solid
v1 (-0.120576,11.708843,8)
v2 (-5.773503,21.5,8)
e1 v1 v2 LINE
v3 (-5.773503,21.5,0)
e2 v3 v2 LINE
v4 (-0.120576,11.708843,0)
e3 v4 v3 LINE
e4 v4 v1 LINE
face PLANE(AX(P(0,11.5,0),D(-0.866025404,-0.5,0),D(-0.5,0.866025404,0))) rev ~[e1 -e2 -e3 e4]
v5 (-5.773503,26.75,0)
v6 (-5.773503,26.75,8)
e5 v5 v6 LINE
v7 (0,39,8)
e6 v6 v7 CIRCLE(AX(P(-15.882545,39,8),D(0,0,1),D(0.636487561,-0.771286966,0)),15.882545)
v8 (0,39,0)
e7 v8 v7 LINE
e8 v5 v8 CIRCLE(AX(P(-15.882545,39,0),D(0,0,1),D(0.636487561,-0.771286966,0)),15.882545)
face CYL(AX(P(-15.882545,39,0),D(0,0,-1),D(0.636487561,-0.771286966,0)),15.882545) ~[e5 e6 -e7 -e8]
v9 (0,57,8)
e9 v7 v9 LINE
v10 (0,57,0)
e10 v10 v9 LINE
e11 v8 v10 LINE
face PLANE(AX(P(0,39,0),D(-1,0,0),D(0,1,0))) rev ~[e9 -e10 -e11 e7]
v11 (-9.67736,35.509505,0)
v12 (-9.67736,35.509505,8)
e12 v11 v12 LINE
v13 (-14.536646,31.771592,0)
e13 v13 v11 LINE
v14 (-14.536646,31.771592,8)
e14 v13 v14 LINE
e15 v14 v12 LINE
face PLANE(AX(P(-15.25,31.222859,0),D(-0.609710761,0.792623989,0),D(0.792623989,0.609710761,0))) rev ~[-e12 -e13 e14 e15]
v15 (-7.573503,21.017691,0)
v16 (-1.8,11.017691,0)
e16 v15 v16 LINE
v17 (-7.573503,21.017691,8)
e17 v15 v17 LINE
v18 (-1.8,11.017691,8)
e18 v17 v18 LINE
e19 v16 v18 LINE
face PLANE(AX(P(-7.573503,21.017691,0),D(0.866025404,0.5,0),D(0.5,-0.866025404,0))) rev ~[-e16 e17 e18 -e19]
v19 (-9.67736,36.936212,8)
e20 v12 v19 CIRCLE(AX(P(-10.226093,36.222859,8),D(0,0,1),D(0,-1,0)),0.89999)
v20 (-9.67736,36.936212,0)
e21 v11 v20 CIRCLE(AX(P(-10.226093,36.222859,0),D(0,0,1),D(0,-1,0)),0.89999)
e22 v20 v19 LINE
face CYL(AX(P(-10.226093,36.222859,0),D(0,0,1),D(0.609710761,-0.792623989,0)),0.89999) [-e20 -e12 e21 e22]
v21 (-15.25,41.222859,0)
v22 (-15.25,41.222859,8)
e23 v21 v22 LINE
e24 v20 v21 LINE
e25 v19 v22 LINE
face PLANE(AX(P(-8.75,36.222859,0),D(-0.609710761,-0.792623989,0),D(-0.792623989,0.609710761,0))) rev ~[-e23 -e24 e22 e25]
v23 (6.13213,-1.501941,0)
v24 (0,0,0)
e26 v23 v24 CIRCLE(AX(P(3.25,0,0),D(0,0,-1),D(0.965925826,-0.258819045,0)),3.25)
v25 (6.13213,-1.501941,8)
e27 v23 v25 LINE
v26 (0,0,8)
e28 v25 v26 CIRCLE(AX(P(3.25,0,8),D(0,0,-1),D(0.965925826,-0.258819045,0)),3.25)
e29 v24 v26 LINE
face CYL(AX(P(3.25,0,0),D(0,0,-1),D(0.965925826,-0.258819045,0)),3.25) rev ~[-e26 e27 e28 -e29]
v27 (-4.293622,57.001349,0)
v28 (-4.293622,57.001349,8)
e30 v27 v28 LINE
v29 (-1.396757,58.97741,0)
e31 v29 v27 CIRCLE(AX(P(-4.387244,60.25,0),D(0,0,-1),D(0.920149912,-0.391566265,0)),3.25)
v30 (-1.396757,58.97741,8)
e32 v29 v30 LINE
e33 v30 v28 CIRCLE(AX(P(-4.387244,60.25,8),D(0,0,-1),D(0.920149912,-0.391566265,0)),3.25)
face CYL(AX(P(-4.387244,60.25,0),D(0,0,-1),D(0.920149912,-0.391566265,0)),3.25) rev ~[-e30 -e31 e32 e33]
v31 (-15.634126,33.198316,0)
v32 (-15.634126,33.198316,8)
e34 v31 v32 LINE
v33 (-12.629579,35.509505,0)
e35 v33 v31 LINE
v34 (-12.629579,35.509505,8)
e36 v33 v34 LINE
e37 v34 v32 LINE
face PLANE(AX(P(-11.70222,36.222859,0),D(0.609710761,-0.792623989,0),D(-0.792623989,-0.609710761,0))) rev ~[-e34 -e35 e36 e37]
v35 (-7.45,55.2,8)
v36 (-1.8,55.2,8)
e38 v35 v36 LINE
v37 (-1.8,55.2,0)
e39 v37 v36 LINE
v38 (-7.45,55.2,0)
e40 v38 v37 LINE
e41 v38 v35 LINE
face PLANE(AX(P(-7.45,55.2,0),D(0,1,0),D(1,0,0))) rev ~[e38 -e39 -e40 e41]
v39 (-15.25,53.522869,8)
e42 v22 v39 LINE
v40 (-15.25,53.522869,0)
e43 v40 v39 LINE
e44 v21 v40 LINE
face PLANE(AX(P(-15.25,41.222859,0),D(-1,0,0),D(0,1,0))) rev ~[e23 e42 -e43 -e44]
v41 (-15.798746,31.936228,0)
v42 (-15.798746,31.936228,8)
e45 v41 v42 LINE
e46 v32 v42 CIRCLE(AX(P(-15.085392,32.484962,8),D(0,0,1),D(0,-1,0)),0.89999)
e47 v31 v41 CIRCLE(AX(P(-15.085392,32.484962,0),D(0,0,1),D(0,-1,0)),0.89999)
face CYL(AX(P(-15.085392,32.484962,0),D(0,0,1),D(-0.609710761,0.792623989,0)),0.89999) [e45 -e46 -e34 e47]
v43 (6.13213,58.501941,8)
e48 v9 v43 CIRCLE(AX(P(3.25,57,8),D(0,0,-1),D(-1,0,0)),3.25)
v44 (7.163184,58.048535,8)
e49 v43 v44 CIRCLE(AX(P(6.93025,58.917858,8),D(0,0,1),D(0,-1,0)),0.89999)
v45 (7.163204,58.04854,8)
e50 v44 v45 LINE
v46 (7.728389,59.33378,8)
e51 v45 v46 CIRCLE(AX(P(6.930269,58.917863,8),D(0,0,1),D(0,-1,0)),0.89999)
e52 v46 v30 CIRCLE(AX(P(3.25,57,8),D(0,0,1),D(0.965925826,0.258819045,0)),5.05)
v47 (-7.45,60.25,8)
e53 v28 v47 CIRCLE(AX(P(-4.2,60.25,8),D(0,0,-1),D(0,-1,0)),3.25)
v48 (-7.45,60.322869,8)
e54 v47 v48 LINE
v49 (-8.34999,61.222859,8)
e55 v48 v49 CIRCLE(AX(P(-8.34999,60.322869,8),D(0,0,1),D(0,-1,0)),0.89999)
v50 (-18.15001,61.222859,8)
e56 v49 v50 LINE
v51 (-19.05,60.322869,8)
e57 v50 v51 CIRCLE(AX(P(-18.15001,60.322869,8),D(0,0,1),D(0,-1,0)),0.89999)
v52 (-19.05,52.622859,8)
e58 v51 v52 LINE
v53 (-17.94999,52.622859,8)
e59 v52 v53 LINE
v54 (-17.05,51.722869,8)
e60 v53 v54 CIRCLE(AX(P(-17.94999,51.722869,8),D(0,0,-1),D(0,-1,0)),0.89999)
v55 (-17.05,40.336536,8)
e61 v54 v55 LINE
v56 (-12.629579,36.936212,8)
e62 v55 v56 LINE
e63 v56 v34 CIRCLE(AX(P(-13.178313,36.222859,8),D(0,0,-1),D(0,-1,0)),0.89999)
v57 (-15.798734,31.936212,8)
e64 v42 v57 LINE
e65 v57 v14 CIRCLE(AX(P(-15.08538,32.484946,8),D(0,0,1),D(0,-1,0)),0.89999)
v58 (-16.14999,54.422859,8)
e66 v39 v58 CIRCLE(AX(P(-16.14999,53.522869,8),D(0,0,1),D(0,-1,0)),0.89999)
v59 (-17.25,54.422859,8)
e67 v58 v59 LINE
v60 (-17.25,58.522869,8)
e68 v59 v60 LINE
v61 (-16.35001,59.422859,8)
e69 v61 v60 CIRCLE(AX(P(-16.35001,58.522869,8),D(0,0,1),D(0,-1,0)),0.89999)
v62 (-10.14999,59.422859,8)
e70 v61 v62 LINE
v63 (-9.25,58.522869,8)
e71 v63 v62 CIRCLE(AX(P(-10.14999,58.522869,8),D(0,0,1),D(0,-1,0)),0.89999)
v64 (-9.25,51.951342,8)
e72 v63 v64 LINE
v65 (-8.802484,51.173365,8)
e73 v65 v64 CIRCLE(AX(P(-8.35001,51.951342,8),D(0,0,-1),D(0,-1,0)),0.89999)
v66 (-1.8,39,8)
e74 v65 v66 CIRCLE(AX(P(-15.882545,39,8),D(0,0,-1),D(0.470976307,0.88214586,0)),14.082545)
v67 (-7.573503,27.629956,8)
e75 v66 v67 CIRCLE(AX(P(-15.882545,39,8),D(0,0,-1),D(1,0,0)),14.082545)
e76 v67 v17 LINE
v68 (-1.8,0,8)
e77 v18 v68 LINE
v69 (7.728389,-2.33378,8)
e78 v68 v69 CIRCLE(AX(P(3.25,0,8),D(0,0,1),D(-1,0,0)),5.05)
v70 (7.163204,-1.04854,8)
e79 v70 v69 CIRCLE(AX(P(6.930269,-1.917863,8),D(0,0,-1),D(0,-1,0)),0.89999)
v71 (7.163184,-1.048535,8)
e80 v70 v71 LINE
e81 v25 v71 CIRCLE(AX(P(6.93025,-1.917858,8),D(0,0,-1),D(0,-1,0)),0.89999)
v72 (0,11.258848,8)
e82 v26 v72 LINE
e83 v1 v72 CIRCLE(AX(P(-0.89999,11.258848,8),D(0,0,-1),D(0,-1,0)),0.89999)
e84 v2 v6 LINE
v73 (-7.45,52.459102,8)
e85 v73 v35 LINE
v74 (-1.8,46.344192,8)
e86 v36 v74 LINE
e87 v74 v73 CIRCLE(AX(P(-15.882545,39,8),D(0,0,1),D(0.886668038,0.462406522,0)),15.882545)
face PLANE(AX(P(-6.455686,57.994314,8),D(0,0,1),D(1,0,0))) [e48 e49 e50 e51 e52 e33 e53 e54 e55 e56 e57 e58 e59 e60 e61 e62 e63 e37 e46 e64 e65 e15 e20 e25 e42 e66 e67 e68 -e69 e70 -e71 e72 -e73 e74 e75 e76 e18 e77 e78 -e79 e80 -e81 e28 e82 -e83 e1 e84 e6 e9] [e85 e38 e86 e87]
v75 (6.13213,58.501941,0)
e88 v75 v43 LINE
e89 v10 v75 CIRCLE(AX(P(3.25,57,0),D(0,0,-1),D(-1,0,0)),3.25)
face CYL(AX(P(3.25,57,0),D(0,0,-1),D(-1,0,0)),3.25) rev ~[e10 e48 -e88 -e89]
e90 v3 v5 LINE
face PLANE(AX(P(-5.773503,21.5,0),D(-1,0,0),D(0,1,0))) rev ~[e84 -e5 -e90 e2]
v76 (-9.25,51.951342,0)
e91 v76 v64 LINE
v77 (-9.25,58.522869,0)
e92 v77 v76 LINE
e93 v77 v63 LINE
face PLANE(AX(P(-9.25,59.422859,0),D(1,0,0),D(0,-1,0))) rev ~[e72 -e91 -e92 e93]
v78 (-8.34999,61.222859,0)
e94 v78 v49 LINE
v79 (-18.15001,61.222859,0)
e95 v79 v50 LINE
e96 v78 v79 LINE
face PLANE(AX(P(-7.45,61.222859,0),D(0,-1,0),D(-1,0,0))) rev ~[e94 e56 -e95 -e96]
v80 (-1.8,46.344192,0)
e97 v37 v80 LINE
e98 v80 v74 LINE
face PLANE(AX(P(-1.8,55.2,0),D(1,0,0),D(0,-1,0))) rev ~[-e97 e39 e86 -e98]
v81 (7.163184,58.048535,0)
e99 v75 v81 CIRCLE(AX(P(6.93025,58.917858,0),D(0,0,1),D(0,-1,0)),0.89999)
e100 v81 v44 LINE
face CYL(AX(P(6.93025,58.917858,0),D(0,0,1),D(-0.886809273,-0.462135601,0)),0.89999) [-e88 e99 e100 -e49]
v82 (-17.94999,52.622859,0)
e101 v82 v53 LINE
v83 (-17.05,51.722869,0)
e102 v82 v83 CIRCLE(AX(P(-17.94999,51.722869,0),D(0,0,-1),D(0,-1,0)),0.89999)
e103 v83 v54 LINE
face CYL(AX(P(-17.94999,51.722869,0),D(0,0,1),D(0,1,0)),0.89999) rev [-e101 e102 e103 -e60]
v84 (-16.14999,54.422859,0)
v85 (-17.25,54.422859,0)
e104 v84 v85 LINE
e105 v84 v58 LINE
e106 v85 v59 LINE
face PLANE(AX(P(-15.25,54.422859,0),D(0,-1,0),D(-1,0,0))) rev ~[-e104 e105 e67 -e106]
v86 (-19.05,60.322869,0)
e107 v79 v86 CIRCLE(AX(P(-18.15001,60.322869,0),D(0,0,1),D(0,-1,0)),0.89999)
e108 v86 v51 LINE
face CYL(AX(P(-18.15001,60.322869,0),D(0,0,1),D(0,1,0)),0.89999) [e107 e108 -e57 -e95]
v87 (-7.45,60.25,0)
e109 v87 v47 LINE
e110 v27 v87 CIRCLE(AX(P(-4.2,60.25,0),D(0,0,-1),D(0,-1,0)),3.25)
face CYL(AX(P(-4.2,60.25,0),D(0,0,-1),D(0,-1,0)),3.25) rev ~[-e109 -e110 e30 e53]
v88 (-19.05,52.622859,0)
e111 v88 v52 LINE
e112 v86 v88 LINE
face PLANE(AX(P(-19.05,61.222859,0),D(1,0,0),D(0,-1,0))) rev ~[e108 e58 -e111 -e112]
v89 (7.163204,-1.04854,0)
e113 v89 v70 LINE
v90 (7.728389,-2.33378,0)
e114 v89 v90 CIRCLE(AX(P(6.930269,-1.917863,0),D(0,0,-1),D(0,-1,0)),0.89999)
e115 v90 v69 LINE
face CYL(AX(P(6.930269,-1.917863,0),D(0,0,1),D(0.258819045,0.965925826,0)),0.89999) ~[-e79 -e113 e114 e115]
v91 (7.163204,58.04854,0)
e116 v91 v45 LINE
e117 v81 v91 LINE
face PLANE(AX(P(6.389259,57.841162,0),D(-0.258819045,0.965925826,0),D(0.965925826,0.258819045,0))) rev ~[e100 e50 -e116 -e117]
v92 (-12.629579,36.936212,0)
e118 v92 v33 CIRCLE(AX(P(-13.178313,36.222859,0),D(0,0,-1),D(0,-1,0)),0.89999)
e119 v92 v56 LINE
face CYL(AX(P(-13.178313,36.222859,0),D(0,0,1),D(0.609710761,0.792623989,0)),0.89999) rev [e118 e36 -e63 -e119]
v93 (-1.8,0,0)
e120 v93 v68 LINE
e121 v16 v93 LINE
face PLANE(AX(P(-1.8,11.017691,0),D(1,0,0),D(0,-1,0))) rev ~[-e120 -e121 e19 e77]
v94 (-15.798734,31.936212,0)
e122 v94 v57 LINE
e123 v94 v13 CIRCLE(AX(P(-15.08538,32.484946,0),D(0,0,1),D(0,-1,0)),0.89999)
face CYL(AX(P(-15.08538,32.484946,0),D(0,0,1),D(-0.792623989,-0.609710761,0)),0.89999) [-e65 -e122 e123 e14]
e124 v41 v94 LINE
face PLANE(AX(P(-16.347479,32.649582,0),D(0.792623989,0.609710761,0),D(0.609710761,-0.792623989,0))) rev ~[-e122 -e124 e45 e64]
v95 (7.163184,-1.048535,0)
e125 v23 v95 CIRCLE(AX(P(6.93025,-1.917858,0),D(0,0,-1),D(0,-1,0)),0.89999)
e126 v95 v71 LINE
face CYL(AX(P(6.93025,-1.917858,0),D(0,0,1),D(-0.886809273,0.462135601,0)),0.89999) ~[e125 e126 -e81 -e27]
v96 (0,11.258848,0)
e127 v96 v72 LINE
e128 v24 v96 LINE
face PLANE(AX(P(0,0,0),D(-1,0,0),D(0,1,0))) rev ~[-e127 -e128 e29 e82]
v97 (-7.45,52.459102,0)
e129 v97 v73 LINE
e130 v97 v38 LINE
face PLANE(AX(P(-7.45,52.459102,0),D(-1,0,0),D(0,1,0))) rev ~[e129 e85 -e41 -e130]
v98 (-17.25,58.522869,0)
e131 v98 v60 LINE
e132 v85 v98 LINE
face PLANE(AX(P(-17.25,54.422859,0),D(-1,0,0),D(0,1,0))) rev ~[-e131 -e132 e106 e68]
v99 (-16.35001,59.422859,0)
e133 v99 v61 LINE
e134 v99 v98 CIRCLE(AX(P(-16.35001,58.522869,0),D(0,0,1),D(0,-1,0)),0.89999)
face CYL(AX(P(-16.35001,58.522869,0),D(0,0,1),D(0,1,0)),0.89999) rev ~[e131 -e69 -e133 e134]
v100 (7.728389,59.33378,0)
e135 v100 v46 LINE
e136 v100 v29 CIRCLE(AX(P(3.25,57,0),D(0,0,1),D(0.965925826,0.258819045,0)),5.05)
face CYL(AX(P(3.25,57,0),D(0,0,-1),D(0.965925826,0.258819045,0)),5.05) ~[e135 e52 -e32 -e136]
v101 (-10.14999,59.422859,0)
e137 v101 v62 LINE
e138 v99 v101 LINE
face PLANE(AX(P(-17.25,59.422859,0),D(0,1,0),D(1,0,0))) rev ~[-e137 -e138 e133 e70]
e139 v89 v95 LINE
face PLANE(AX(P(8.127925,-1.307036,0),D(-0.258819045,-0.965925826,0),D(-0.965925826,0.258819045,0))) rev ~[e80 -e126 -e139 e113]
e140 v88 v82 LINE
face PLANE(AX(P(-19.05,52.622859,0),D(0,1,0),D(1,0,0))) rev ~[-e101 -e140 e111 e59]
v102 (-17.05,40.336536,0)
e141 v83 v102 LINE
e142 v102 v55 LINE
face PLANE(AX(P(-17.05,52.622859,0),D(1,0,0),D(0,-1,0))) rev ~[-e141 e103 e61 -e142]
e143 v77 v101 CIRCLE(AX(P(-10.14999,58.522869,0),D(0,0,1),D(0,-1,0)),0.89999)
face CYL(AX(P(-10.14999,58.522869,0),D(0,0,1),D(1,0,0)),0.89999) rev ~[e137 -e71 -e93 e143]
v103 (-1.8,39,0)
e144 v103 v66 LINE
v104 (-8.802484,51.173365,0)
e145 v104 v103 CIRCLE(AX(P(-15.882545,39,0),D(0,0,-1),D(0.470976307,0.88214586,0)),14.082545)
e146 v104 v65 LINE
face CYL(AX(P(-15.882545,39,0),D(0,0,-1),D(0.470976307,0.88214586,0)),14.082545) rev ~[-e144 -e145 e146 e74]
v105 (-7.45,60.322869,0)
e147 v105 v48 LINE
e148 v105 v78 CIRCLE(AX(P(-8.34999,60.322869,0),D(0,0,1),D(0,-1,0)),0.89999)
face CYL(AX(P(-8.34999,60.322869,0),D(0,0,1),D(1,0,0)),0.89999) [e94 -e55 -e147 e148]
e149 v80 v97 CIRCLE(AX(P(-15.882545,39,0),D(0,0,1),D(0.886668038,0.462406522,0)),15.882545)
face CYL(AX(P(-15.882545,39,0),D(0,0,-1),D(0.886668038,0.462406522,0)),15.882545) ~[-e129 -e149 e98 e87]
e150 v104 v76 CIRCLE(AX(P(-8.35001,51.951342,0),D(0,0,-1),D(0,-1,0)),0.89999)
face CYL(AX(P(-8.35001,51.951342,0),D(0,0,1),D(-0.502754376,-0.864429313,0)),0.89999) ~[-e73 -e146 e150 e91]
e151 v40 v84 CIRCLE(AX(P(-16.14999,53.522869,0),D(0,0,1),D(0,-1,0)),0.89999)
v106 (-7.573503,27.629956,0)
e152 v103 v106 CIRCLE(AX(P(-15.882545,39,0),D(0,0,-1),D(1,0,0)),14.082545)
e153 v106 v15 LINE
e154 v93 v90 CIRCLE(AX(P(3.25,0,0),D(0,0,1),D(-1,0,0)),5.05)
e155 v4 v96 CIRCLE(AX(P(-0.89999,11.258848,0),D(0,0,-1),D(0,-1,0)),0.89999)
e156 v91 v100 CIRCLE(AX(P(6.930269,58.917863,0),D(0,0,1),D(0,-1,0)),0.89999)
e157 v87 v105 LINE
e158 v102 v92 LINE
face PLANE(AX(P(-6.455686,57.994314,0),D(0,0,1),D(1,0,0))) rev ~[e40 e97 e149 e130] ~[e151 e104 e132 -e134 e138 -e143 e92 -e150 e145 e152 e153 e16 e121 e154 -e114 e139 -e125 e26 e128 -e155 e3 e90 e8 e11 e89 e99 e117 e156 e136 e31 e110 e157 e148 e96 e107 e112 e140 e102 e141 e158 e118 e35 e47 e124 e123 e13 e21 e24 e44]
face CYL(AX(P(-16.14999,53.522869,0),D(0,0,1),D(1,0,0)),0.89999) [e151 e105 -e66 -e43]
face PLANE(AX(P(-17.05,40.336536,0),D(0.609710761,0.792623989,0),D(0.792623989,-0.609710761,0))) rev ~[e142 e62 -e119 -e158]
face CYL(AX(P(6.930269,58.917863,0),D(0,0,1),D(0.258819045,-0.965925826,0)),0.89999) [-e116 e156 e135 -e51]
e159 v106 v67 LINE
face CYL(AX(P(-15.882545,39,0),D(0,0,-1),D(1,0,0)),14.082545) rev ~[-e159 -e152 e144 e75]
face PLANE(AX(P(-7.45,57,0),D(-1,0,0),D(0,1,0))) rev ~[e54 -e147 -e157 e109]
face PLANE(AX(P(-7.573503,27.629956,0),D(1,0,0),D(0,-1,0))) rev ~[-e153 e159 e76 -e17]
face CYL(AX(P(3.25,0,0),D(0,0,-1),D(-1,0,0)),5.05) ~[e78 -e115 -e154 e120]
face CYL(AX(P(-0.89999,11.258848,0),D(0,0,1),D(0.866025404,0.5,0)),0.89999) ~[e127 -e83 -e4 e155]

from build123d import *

# Parameters (mm, degrees)
F1_DEPTH    = 8
F2_R        = 0.89999
F3_T1_DEPTH = 8


# Not quite as in the source:
# - a fillet or chamfer that OpenCascade refuses, or shapes differently, is made with other operations: its cross-section is extruded or revolved along the edge and cut away or added
# - a fillet or chamfer is up to 0.001 mm smaller than in the source, because OpenCascade refuses the exact size
# - a feature names something its author has since deleted; it is built from what else it names


with BuildPart() as f1:
    # F0 (on Top) → F1 (new body)
    with BuildSketch(Plane.XY):
        with BuildLine():
            ThreePointArc((0, 57), (2.8257898753, 60.2221957995), (6.3892589354, 57.8411618966))
            Line((6.3892589354, 57.8411618966), (8.1279254228, 58.3070361778))
            ThreePointArc((8.1279254228, 58.3070361778), (2.5908427293, 62.0067965499), (-1.8, 57))
            Line((-1.8, 57), (-7.45, 57))
            Line((-7.45, 57), (-7.45, 61.2228588262))
            Line((-7.45, 61.2228588262), (-9.7, 61.2228588262))
            Line((-9.7, 61.2228588262), (-19.05, 61.2228588262))
            Line((-19.05, 61.2228588262), (-19.05, 52.6228588262))
            Line((-19.05, 52.6228588262), (-17.05, 52.6228588262))
            Line((-17.05, 52.6228588262), (-17.05, 40.3365361308))
            Line((-17.05, 40.3365361308), (-11.702219504, 36.2228588262))
            Line((-11.702219504, 36.2228588262), (-16.3474793695, 32.6495820066))
            Line((-16.3474793695, 32.6495820066), (-15.25, 31.2228588262))
            Line((-15.25, 31.2228588262), (-8.75, 36.2228588262))
            Line((-8.75, 36.2228588262), (-15.25, 41.2228588262))
            Line((-15.25, 41.2228588262), (-15.25, 54.4228588262))
            Line((-15.25, 54.4228588262), (-17.25, 54.4228588262))
            Line((-17.25, 54.4228588262), (-17.25, 59.4228588262))
            Line((-17.25, 59.4228588262), (-9.25, 59.4228588262))
            Line((-9.25, 59.4228588262), (-9.25, 57))
            Line((-9.25, 57), (-9.25, 51.4228588262))
            ThreePointArc((-9.25, 51.4228588262), (-3.8052690832, 46.2427536444), (-1.8, 39))
            ThreePointArc((-1.8, 39), (-3.3260618955, 32.624044706), (-7.5735026919, 27.6299564509))
            Line((-7.5735026919, 27.6299564509), (-7.5735026919, 21.0176914536))
            Line((-7.5735026919, 21.0176914536), (-1.8, 11.0176914536))
            Line((-1.8, 11.0176914536), (-1.8, 0))
            ThreePointArc((-1.8, 0), (2.5908427293, -5.0067965499), (8.1279254228, -1.3070361778))
            Line((8.1279254228, -1.3070361778), (6.3892589354, -0.8411618966))
            ThreePointArc((6.3892589354, -0.8411618966), (2.8257898753, -3.2221957995), (0, 0))
            Line((0, 0), (0, 11.5))
            Line((0, 11.5), (-5.7735026919, 21.5))
            Line((-5.7735026919, 21.5), (-5.7735026919, 26.75))
            ThreePointArc((-5.7735026919, 26.75), (-1.5156985287, 32.2288141117), (0, 39))
            Line((0, 39), (0, 57))
        make_face()
        with BuildLine():
            Line((-7.45, 55.2), (-1.8, 55.2))
            Line((-1.8, 55.2), (-1.8, 46.3441924145))
            ThreePointArc((-1.8, 46.3441924145), (-4.2171968015, 49.7784455096), (-7.45, 52.4591018057))
            Line((-7.45, 52.4591018057), (-7.45, 55.2))
        make_face(mode=Mode.SUBTRACT)
    extrude(amount=F1_DEPTH)

    # F2 (radius 0.9 in the source; OpenCascade refuses exactly that, so slightly less here)
    f2_edges = [f1.edges().sort_by_distance(p)[0] for p in [
        (8.127925, 58.307036, 4),
        (6.389259, 57.841162, 4),
        (8.127925, -1.307036, 4),
        (6.389259, -0.841162, 4),
        (-11.70222, 36.222859, 4),
        (-16.347479, 32.649582, 4),
        (-15.25, 31.222859, 4),
        (-8.75, 36.222859, 4),
        (-17.25, 59.422859, 4),
        (-15.25, 54.422859, 4),
        (-9.25, 59.422859, 4),
        (-19.05, 61.222859, 4),
        (-17.05, 52.622859, 4),
        (-9.25, 51.422859, 4),
        (0, 11.5, 4),
        (-7.45, 61.222859, 4),
    ]]
    fillet(f2_edges, radius=F2_R)

    # F3: fillet of radius 3.25 on 2 edges, made by hand

    # F3_s2 → F3_t1 (join)
    with BuildSketch(Plane.XY):
        with BuildLine():
            ThreePointArc((-4.2, 57), (-6.4980970389, 57.9519029611), (-7.45, 60.25))
            Line((-7.45, 60.25), (-7.45, 57))
            Line((-7.45, 57), (-4.2, 57))
        make_face()
        with BuildLine():
            ThreePointArc((-1.3967570543, 58.9774096386), (-2.5946788815, 57.5390574817), (-4.3872442674, 57))
            Line((-4.3872442674, 57), (-1.8, 57))
            ThreePointArc((-1.8, 57), (-1.698162443, 58.0090532384), (-1.3967570543, 58.9774096386))
        make_face()
    extrude(amount=F3_T1_DEPTH)


solid = f1.part
